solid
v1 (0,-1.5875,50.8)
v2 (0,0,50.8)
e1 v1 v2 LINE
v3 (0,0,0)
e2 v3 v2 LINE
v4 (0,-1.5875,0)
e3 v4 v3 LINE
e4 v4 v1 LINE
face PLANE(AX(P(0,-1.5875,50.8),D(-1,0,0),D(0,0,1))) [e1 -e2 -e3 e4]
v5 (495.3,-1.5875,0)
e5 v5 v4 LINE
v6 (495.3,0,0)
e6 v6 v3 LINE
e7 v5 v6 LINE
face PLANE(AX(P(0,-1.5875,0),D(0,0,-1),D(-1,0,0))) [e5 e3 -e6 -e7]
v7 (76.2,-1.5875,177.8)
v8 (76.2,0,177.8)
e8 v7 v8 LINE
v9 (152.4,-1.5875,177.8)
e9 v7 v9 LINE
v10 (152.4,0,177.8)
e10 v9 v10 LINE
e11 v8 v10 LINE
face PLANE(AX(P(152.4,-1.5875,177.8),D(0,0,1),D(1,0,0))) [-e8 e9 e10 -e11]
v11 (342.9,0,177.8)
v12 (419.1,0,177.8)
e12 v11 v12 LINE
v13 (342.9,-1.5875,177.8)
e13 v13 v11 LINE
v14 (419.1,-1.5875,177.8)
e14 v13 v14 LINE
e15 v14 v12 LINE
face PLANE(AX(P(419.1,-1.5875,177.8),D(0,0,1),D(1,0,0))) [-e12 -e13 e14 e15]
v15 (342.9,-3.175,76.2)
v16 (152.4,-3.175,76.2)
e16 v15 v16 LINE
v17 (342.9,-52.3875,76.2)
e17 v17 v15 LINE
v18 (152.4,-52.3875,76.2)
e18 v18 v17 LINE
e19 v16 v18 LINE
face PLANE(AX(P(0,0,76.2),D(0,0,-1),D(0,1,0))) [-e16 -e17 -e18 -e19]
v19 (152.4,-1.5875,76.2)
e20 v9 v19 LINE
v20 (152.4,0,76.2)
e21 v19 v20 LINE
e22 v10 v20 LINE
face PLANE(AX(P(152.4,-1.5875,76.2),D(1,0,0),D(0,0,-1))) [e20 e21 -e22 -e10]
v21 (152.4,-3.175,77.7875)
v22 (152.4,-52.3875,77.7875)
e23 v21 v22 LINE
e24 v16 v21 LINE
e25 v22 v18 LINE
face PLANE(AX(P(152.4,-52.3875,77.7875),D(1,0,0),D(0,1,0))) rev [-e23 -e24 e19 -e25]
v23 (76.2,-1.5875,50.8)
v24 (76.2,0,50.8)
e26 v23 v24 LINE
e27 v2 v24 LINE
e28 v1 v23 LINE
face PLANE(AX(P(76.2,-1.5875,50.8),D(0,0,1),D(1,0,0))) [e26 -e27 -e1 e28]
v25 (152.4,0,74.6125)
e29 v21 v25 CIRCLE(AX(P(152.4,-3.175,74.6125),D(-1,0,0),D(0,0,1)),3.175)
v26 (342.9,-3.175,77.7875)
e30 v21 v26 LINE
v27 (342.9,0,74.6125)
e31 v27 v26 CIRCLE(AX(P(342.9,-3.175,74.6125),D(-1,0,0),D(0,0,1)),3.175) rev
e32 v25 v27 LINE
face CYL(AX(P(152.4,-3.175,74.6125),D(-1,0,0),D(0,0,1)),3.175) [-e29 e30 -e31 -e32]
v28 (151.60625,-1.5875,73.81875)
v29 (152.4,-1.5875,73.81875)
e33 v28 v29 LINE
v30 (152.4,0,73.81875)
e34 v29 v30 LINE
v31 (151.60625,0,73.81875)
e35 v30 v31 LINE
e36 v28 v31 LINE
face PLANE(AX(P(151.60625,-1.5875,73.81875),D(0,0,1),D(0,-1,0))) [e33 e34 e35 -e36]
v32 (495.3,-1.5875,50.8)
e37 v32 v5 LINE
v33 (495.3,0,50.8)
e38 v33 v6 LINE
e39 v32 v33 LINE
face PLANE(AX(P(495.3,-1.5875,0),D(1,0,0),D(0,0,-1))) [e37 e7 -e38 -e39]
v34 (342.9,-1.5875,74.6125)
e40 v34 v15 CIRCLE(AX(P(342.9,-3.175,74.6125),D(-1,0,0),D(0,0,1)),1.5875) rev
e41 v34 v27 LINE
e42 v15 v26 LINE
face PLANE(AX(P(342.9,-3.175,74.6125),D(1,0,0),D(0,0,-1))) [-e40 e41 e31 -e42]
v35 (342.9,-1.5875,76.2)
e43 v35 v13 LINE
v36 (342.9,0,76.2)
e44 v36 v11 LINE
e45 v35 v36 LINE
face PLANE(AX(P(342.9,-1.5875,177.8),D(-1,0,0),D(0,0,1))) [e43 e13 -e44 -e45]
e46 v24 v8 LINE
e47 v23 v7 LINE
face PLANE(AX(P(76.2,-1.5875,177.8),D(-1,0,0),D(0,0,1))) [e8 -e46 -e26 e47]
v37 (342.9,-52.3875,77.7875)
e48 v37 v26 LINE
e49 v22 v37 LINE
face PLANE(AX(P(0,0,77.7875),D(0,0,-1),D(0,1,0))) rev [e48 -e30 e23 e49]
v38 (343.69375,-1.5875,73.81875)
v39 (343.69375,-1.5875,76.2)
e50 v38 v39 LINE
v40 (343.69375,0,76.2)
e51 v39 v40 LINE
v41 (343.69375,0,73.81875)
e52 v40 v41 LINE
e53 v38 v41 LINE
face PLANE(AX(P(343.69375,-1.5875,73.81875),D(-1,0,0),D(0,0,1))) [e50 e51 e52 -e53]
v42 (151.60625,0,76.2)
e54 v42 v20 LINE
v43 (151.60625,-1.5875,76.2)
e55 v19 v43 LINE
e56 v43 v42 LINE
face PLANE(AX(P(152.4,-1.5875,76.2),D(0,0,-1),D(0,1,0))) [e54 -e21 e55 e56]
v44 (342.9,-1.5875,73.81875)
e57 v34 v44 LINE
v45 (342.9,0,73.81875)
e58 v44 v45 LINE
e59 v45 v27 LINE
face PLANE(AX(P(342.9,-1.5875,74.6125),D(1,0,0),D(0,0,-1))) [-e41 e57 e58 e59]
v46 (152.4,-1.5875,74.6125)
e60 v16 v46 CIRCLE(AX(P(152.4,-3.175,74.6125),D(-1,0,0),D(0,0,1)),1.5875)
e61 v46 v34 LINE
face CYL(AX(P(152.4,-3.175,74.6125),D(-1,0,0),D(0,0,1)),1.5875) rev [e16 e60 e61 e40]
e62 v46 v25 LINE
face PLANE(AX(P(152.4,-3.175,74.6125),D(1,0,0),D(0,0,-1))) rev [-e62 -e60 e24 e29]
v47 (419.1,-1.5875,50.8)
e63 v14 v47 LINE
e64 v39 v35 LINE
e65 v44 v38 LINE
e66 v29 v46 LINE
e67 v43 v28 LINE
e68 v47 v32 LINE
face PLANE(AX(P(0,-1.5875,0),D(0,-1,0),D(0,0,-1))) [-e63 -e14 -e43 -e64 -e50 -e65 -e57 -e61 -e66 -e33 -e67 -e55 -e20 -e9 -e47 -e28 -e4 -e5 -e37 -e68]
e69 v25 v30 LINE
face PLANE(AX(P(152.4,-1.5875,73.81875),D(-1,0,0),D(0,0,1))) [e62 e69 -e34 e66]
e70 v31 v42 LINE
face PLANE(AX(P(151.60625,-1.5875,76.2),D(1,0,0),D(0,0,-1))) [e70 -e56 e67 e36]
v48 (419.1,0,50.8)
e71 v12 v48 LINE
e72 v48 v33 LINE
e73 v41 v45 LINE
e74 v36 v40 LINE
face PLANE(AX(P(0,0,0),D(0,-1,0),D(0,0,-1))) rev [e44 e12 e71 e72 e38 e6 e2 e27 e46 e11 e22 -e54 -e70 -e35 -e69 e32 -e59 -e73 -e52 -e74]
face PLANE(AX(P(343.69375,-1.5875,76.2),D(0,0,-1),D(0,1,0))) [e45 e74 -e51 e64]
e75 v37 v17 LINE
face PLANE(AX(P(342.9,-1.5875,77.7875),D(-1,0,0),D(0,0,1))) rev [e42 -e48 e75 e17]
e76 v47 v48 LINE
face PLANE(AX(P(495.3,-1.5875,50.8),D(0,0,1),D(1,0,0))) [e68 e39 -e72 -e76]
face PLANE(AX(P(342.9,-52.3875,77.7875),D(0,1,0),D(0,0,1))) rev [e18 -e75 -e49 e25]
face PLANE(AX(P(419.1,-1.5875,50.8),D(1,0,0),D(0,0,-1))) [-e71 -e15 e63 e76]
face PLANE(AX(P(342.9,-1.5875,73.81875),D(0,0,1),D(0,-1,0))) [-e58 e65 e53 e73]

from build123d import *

# Parameters (mm, degrees)
BASE_FLANGE1_DEPTH       = 1.5875
EDGE_FLANGE1_START       = -2.38125
EDGE_FLANGE1_OUTLINE_W   = 0.79375
EDGE_FLANGE1_OUTLINE_H   = 1.5875
EDGE_FLANGE1_DEPTH       = 2.38125
EDGE_FLANGE1_START_2     = 74.6125
EDGE_FLANGE1_2_OUTLINE_W = 190.5
EDGE_FLANGE1_2_OUTLINE_H = 50.8
EDGE_FLANGE1_2_DEPTH     = 3.175
EDGE_FLANGE1_START_3     = 76.2
EDGE_FLANGE1_3_OUTLINE_W = 190.5
EDGE_FLANGE1_3_OUTLINE_H = 1.5875
EDGE_FLANGE1_3_DEPTH     = 1.2613005
EDGE_FLANGE1_START_4     = 152.4
EDGE_FLANGE1_4_DEPTH     = 190.5


with BuildPart() as part:
    # Base-Flange1: sheet metal written as solids
    # Sketch1 → Base-Flange1 (new body)
    with BuildSketch(Plane(origin=(0, 0, 0), x_dir=(1, 0, 0), z_dir=(0, 1, 0))):
        Polygon((0, 0), (495.3, 0), (495.3, -50.8), (419.1, -50.8), (419.1, -177.8), (342.9, -177.8), (342.9, -76.2), (152.4, -76.2), (152.4, -177.8), (76.2, -177.8), (76.2, -50.8), (0, -50.8), align=None)
    extrude(amount=-BASE_FLANGE1_DEPTH)

    # Edge-Flange1: read off the stored shape, not the designer's step
    # Edge-Flange1 outline → Edge-Flange1 (cut)
    with BuildSketch(Plane(origin=(0, -1.5875, 76.2), x_dir=(-1, 0, 0), z_dir=(0, 0, 1)).offset(EDGE_FLANGE1_START)):
        with Locations((-152.003125, -0.79375)):
            Rectangle(EDGE_FLANGE1_OUTLINE_W, EDGE_FLANGE1_OUTLINE_H)
        with Locations((-343.296875, -0.79375)):
            Rectangle(EDGE_FLANGE1_OUTLINE_W, EDGE_FLANGE1_OUTLINE_H)
    extrude(amount=EDGE_FLANGE1_DEPTH, mode=Mode.SUBTRACT)

    # Edge-Flange1 2 outline → Edge-Flange1 2 (add)
    with BuildSketch(Plane.XY.offset(EDGE_FLANGE1_START_2)):
        with Locations((247.65, -26.9875)):
            Rectangle(EDGE_FLANGE1_2_OUTLINE_W, EDGE_FLANGE1_2_OUTLINE_H)
    extrude(amount=EDGE_FLANGE1_2_DEPTH)

    # Edge-Flange1 3 outline → Edge-Flange1 3 (add)
    with BuildSketch(Plane.XY.offset(EDGE_FLANGE1_START_3)):
        with Locations((247.65, -0.79375)):
            Rectangle(EDGE_FLANGE1_3_OUTLINE_W, EDGE_FLANGE1_3_OUTLINE_H)
    extrude(amount=EDGE_FLANGE1_3_DEPTH)

    # Edge-Flange1 4 outline → Edge-Flange1 4 (cut)
    with BuildSketch(Plane.YZ.offset(EDGE_FLANGE1_START_4)):
        with BuildLine():
            Line((-3.175, 76.2), (-52.3875, 76.2))
            Line((-52.3875, 76.2), (-52.3875, 74.6125))
            Line((-52.3875, 74.6125), (-1.5875, 74.6125))
            ThreePointArc((-1.5875, 74.6125), (-2.052467985, 75.735032015), (-3.175, 76.2))
        make_face()
        with BuildLine():
            Line((-1.5875, 77.7875), (-3.175, 77.7875))
            ThreePointArc((-3.175, 77.7875), (-0.92993597, 76.85756403), (0, 74.6125))
            Line((0, 74.6125), (0, 77.4613005))
            Line((0, 77.4613005), (-1.5875, 77.4613005))
            Line((-1.5875, 77.4613005), (-1.5875, 77.7875))
        make_face()
    extrude(amount=EDGE_FLANGE1_4_DEPTH, mode=Mode.SUBTRACT)


solid = part.part
